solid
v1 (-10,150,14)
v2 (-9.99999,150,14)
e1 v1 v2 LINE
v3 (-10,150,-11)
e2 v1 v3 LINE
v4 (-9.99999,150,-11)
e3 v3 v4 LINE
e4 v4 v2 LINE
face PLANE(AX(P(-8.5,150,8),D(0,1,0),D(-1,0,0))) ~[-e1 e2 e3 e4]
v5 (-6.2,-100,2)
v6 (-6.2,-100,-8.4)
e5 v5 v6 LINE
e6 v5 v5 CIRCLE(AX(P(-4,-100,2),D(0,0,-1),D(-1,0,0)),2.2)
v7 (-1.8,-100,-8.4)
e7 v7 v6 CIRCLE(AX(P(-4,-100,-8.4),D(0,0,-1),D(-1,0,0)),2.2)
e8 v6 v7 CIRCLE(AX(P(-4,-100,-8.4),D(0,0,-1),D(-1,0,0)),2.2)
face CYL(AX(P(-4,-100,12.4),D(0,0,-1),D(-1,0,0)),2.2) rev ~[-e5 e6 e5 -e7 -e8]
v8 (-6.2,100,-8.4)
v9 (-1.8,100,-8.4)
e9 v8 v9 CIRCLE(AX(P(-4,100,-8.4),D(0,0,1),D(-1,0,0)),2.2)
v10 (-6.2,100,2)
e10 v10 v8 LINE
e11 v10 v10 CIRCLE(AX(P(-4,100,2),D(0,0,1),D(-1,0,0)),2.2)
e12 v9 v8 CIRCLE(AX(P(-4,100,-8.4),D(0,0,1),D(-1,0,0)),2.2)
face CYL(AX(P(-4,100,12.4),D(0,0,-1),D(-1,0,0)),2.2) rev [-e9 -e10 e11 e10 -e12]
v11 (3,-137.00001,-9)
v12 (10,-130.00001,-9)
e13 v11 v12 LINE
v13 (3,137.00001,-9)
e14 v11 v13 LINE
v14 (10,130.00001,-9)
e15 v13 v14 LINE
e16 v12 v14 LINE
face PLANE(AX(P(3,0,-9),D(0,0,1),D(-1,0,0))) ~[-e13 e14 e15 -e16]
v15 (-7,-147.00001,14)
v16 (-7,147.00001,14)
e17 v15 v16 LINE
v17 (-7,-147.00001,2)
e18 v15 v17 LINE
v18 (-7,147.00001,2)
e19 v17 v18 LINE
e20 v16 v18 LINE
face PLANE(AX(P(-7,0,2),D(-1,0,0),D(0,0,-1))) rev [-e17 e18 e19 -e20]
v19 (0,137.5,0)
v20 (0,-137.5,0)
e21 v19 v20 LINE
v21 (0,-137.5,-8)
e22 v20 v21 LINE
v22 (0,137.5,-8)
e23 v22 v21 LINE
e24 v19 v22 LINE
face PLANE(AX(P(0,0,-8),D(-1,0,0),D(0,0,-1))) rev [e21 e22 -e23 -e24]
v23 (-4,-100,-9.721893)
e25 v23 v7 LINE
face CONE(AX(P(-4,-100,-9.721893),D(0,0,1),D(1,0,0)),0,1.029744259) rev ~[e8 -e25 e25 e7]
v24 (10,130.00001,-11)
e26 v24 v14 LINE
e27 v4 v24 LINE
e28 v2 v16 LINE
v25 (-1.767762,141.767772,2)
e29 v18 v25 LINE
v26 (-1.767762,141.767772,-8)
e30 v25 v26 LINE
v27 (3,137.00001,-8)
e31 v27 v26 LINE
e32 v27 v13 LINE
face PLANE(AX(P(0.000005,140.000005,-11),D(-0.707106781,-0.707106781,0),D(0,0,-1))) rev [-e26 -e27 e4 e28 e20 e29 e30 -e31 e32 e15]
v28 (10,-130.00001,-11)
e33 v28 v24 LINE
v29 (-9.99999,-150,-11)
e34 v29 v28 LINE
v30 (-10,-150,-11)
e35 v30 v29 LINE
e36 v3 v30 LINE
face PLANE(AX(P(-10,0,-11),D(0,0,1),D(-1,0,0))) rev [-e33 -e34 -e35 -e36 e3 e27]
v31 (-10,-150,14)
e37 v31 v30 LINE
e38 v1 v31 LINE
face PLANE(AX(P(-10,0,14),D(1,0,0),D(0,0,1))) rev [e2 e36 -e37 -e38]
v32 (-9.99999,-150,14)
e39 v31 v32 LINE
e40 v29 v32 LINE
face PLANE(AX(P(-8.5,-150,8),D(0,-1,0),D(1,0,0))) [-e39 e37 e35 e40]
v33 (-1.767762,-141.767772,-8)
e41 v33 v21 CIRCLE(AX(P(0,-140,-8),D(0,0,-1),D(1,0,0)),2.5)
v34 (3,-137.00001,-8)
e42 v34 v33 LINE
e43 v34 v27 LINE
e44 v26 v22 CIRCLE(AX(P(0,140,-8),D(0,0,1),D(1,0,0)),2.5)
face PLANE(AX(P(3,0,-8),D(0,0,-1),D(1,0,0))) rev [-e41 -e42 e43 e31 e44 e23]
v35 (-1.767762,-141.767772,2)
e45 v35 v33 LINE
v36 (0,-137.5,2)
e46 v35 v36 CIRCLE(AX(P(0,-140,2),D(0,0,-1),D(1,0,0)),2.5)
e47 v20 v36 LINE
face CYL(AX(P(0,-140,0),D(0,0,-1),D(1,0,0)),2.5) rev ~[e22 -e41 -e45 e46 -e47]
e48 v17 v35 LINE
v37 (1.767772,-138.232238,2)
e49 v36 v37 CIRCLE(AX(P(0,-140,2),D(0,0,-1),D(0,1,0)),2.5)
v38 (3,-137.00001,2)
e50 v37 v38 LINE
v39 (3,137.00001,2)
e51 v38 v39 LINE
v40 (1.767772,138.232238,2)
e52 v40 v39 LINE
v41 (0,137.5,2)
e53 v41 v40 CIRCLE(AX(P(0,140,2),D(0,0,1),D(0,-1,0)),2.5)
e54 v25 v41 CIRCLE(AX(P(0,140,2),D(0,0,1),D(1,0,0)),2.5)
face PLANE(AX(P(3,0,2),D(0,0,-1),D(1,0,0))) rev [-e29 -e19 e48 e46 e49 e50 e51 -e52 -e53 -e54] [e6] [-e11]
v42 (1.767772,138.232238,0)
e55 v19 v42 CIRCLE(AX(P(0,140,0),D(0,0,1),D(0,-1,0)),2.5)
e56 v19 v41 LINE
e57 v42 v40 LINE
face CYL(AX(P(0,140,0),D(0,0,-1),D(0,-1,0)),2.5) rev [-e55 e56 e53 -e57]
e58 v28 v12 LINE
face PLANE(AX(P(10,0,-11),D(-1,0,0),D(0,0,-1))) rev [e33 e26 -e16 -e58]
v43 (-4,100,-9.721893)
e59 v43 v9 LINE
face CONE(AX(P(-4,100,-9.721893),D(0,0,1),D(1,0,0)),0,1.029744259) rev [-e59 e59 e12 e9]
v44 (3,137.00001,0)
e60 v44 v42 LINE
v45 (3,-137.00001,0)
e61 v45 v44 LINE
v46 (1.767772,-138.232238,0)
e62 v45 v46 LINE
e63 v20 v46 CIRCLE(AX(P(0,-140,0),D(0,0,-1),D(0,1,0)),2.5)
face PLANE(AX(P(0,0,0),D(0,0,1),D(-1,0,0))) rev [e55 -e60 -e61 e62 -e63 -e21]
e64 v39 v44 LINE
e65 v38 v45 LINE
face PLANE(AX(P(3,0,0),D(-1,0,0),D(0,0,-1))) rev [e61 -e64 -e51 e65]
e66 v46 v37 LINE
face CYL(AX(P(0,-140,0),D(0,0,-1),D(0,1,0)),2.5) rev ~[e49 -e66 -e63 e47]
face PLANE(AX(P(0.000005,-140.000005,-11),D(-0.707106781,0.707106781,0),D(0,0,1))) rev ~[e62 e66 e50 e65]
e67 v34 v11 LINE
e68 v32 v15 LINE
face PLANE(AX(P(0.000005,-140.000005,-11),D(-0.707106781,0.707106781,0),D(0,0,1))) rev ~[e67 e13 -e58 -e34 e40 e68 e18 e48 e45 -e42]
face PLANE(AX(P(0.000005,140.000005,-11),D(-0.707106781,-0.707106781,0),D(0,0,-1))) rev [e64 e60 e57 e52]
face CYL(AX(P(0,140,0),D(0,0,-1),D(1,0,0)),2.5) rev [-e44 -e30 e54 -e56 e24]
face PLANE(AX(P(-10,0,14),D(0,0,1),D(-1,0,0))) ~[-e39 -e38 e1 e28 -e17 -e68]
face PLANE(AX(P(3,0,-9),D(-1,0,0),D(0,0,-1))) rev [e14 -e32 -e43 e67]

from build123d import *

# Parameters (mm, degrees)
F0_W     = 3
F0_H     = 12
F0_W_2   = 7
F0_H_2   = 1
F1_DEPTH = 150
F3_D     = 4.4
F3_DEPTH = 10.4
F3_TIP   = 1.3218933619
F4_SIZE  = 19.99999
F6_DEPTH = 8


# Not quite as in the source:
# - a fillet or chamfer is up to 0.001 mm smaller than in the source, because OpenCascade refuses the exact size


with BuildPart() as f1:
    # F0 (on Front) → F1 (new body)
    with BuildSketch(Plane.XZ):
        with Locations((-8.5, 8)):
            Rectangle(F0_W, F0_H)
        Polygon((-10, 0), (0, 0), (3, 0), (3, 2), (-7, 2), (-10, 2), align=None)
        Polygon((0, -8), (0, 0), (-10, 0), (-10, -10), (0, -10), align=None)
        Polygon((0, -10), (-10, -10), (-10, -11), (10, -11), (10, -10), (3, -10), align=None)
        with Locations((6.5, -9.5)):
            Rectangle(F0_W_2, F0_H_2)
        Polygon((3, -8), (0, -8), (0, -10), (3, -10), (3, -9), align=None)
    extrude(amount=F1_DEPTH)

    # F3
    with Locations(Plane.XY.offset(2)):
        with Locations((-4, -100)):
            Hole(F3_D / 2, depth=F3_DEPTH)
            with Locations((0, 0, -(F3_DEPTH + F3_TIP / 2))):  # 118° drill point
                Cone(0, F3_D / 2, F3_TIP, mode=Mode.SUBTRACT)

    # F4 (size 20 in the source; OpenCascade refuses exactly that, so slightly less here)
    f4_edges = [f1.edges().sort_by_distance(p)[0] for p in [
        (10, -150, -10),
    ]]
    chamfer(f4_edges, length=F4_SIZE)

    # F5 (on face) → F6 (cut, symmetric)
    with BuildSketch(Plane(origin=(0, 0, 0), x_dir=(1, 0, 0), z_dir=(0, 0, -1))):
        with BuildLine():
            ThreePointArc((1.767771953, 138.232238047), (2.3097001843, 139.0432946855), (2.5, 140))
            ThreePointArc((2.5, 140), (-1.767766953, 141.767766953), (0, 137.5))
            Line((0, 137.5), (0, 140.00001))
            Line((0, 140.00001), (1.767771953, 138.232238047))
        make_face()
        with BuildLine():
            Line((0, 140.00001), (0, 137.5))
            ThreePointArc((0, 137.5), (0.9567118473, 137.6903025217), (1.767771953, 138.232238047))
            Line((1.767771953, 138.232238047), (0, 140.00001))
        make_face()
    extrude(amount=F6_DEPTH, both=True, mode=Mode.SUBTRACT)

    # F7: F1 across face


with BuildPart() as f1_1:
    add(f1.part)
    add(f1.part.mirror(Plane(origin=(-4.3205128205, 0, -2.6487179487), x_dir=(1, 0, 0), z_dir=(0, 1, 0))))


solid = f1_1.part
